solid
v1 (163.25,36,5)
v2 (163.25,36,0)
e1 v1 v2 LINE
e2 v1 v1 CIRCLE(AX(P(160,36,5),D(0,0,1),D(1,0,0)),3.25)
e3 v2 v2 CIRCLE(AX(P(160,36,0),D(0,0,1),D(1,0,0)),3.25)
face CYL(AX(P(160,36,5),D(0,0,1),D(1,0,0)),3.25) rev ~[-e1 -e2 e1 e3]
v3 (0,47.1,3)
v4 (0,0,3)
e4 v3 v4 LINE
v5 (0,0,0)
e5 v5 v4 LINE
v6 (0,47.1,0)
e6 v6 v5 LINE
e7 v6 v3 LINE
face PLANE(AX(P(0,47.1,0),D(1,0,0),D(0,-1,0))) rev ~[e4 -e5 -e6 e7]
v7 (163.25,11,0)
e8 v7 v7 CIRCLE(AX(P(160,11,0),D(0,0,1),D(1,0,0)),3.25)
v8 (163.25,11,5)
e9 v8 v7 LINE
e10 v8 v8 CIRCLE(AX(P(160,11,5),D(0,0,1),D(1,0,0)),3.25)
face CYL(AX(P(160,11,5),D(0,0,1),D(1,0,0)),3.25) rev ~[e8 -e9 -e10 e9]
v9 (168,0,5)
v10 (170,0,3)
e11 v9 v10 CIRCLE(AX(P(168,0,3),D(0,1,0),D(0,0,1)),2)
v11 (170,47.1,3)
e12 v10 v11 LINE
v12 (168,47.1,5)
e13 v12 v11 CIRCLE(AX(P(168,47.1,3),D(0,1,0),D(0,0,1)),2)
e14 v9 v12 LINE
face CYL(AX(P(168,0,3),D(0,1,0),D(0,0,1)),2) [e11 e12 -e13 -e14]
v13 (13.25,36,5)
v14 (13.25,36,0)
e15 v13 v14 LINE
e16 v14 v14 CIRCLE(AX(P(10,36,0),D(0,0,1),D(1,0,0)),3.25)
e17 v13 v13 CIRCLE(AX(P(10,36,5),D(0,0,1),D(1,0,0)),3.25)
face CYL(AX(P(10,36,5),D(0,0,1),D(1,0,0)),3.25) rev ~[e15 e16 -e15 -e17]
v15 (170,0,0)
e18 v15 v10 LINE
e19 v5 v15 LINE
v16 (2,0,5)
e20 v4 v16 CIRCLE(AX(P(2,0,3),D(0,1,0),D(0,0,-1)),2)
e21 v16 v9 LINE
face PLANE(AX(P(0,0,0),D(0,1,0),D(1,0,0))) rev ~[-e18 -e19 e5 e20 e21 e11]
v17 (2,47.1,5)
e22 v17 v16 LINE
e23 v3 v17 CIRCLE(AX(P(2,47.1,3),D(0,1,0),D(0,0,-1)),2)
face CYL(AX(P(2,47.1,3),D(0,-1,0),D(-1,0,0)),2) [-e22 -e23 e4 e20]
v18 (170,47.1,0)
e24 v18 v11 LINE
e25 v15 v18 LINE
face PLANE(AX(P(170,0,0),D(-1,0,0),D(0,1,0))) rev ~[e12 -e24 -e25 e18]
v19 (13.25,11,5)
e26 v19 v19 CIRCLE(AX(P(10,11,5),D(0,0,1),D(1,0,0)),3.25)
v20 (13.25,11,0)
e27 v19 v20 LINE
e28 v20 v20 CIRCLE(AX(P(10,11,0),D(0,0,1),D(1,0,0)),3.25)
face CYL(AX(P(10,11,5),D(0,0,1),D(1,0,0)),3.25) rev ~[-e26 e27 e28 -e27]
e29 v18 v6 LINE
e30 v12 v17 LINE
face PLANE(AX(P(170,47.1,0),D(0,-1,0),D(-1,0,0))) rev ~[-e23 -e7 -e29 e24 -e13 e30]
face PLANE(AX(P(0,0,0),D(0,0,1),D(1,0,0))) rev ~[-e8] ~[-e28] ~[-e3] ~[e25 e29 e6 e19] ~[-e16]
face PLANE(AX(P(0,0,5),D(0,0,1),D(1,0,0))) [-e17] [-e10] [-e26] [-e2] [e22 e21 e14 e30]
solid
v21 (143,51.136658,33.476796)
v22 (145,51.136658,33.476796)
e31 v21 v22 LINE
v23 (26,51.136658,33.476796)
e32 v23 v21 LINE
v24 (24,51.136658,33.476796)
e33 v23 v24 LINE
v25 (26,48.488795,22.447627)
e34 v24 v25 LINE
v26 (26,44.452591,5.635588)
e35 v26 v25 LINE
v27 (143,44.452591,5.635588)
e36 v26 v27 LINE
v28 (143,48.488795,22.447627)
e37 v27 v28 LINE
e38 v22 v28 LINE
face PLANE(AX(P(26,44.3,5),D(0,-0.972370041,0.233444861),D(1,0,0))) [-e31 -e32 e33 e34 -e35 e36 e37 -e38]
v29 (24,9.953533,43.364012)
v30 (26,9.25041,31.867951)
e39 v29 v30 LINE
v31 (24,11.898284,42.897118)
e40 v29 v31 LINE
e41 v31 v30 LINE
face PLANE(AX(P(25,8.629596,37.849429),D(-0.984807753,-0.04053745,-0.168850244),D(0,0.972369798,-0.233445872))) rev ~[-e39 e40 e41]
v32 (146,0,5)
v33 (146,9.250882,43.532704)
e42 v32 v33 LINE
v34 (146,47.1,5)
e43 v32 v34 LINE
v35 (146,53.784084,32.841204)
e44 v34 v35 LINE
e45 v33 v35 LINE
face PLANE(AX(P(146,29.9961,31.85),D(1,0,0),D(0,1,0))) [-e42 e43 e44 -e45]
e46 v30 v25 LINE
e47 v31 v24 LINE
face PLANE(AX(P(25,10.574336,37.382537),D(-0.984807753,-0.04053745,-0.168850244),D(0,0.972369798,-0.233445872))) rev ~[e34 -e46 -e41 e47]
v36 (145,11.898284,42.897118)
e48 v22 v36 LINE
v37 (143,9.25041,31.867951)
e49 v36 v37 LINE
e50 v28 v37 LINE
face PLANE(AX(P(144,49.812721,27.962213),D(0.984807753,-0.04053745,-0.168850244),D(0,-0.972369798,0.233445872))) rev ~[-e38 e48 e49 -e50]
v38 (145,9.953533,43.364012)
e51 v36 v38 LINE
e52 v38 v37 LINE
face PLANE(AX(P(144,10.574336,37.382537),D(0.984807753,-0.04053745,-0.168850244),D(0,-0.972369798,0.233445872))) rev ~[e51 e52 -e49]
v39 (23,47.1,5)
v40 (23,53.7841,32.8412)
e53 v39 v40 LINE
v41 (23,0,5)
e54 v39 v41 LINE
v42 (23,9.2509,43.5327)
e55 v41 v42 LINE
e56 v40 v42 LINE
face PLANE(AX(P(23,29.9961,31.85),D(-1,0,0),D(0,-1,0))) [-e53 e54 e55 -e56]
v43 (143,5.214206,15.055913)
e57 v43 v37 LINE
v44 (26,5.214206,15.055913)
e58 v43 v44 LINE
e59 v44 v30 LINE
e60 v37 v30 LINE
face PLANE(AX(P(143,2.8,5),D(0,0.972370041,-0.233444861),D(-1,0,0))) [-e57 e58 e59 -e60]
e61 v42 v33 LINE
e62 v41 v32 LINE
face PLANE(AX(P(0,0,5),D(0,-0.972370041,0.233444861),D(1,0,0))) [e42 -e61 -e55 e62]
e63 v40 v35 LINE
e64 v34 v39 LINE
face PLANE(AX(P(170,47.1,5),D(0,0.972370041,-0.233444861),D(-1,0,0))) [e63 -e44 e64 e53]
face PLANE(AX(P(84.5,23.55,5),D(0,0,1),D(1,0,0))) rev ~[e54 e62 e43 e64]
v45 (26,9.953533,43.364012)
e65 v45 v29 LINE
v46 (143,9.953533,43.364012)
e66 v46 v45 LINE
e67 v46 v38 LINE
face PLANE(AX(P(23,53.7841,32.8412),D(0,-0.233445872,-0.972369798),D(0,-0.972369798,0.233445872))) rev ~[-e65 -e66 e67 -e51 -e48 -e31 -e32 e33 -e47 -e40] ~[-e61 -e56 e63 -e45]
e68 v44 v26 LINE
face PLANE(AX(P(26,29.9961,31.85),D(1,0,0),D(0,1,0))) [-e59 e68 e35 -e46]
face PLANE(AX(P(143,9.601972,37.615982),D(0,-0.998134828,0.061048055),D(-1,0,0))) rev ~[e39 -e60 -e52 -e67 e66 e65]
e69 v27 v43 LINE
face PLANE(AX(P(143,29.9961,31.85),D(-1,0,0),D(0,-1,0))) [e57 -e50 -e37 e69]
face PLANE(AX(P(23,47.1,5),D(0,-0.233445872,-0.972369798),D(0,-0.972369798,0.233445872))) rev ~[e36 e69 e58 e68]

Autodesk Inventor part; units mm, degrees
ref_plane "YZ Plane" through (0, 0, 0) normal (1, 0, 0) x (0, 1, 0)
ref_plane "XZ Plane" through (0, 0, 0) normal (0, 1, 0) x (-1, 0, 0)
ref_plane "XY Plane" through (0, 0, 0) normal (0, 0, 1) x (1, 0, 0)
sketch "Sketch1" plane through (0, 0, 0) normal (0, 0, 1) x (1, 0, 0)
  line L0 (0, 0) -> (170, 0)
  line L1 (170, 0) -> (170, 47.1)
  line L2 (170, 47.1) -> (0, 47.1)
  line L3 (0, 47.1) -> (0, 0)
  dimension "d0" = 170
  dimension "d1" = 47.1
extrude "Extrusion1" add sketch "Sketch1" along normal blind 5
sketch "Sketch2" plane through (0, 0, 5) normal (0, 0, 1) x (1, 0, 0)
  line L0 (0, 0) -> (170, 0) projected
  line L1 (170, 47.1) -> (0, 47.1) projected
  line L2 (146, 0) -> (23, 0)
  line L3 (23, 0) -> (23, 47.1)
  line L4 (23, 47.1) -> (146, 47.1)
  line L5 (146, 47.1) -> (146, 0)
  line L6 (143, 2.8) -> (26, 2.8)
  line L7 (26, 2.8) -> (26, 44.3)
  line L8 (26, 44.3) -> (143, 44.3)
  line L9 (143, 44.3) -> (143, 2.8)
  line L10 (170, 0) -> (170, 47.1) projected
  point P0 (146, 47.1)
  point P1 (23, 0)
  dimension "d4" = 123
  dimension "d5" = 117
  dimension "d6" = 3
  dimension "d7" = 2.8
  dimension "d8" = 2.8
  dimension "d9" = 24
sketch "Sketch3" plane through (0, 0, 5) normal (0, 0, 1) x (1, 0, 0)
  circle A0 centre (160, 11) radius 3.25
  circle A1 centre (160, 36) radius 3.25
  line L0 (170, 0) -> (170, 47.1) projected
  line L1 (0, 0) -> (170, 0) projected
  line L2 (85, -16.6248) -> (85, 70.7208)
  line L3 (0, 47.1) -> (0, 0) projected
  circle A2 centre (10, 11) radius 3.25
  circle A3 centre (10, 36) radius 3.25
  point P0 (146, 0)
  dimension "d21" = 6.5
  dimension "d22" = 6.5
  dimension "d23" = 10
  dimension "d24" = 10
  dimension "d25" = 25
  dimension "d26" = 11
  dimension "d27" = 85
extrude "Extrusion3" cut sketch "Sketch3" against normal blind 60
sketch "Sketch4" plane through (0, 0, 0) normal (-1, 0, 0) x (0, 0, 1)
  line L0 (5, 0) -> (5, 47) projected
  line L1 (5, 23.5) -> (58.7, 36.3922)
  point P0 (0, 0)
  dimension "d30" = 76.5
sweep "Sweep1" add profiles "Sketch2" path "Sketch4" separate body path curves L1 contours L3 L1 L5 L0
sketch "Sketch5" plane through (23, 0, 5) normal (-1, 0, 0) x (0, 0, 1)
  line L0 (0, 47.1) -> (53.7, 59.9922) projected
  line L1 (0, 47.1) -> (10.6915, 2.5668)
  line L2 (0, 0) -> (53.7, 12.8922) projected
  line L3 (0, 47.1) -> (0, 0) projected
  line L4 (0, 0) -> (0, 47.1)
  point P0 (-5, 0)
  dimension "d42" = 13.5
extrude "Extrusion4" add sketch "Sketch5" against normal up to surface (123 mm away) bodies 2
sketch "Sketch6" plane through (23, 0, 5) normal (-1, 0, 0) x (0, 0, 1)
  line L0 (0, 0) -> (53.7, 12.8922) projected
  line L1 (53.7, 59.9922) -> (53.7, 12.8922)
  line L2 (0, 47.1) -> (53.7, 59.9922) projected
  line L3 (53.7, 59.9922) -> (27.8412, 53.7841)
  line L4 (27.8412, 53.7841) -> (38.5327, 9.2509)
  line L5 (0, 0) -> (53.7, 12.8922) projected
  line L6 (38.5327, 9.2509) -> (53.7, 12.8922)
  point P0 (-5, 0)
  point P1 (38.5327, 9.2509)
  dimension "d59" = 13.5
extrude "Extrusion5" cut sketch "Sketch6" against normal through all bodies 2
fillet "Fillet3" radius 2 2 edges at (0, 23.55, 5) (170, 23.55, 5)
chamfer "Chamfer11" distance 2 angle 80 1 edges at (84.5, 11.8983, 42.8971) measured on face at (65, 10.1333, 43.3208)
chamfer "Chamfer12" distance 2 angle 80 1 edges at (143, 31.5175, 38.1869) measured on face at (104, 52.9016, 33.0531)
chamfer "Chamfer13" distance 2 angle 80 1 edges at (26, 31.5175, 38.1869) measured on face at (104, 52.9016, 33.0531)
properties part number "FlaskHolderTilted_13_1_final"
